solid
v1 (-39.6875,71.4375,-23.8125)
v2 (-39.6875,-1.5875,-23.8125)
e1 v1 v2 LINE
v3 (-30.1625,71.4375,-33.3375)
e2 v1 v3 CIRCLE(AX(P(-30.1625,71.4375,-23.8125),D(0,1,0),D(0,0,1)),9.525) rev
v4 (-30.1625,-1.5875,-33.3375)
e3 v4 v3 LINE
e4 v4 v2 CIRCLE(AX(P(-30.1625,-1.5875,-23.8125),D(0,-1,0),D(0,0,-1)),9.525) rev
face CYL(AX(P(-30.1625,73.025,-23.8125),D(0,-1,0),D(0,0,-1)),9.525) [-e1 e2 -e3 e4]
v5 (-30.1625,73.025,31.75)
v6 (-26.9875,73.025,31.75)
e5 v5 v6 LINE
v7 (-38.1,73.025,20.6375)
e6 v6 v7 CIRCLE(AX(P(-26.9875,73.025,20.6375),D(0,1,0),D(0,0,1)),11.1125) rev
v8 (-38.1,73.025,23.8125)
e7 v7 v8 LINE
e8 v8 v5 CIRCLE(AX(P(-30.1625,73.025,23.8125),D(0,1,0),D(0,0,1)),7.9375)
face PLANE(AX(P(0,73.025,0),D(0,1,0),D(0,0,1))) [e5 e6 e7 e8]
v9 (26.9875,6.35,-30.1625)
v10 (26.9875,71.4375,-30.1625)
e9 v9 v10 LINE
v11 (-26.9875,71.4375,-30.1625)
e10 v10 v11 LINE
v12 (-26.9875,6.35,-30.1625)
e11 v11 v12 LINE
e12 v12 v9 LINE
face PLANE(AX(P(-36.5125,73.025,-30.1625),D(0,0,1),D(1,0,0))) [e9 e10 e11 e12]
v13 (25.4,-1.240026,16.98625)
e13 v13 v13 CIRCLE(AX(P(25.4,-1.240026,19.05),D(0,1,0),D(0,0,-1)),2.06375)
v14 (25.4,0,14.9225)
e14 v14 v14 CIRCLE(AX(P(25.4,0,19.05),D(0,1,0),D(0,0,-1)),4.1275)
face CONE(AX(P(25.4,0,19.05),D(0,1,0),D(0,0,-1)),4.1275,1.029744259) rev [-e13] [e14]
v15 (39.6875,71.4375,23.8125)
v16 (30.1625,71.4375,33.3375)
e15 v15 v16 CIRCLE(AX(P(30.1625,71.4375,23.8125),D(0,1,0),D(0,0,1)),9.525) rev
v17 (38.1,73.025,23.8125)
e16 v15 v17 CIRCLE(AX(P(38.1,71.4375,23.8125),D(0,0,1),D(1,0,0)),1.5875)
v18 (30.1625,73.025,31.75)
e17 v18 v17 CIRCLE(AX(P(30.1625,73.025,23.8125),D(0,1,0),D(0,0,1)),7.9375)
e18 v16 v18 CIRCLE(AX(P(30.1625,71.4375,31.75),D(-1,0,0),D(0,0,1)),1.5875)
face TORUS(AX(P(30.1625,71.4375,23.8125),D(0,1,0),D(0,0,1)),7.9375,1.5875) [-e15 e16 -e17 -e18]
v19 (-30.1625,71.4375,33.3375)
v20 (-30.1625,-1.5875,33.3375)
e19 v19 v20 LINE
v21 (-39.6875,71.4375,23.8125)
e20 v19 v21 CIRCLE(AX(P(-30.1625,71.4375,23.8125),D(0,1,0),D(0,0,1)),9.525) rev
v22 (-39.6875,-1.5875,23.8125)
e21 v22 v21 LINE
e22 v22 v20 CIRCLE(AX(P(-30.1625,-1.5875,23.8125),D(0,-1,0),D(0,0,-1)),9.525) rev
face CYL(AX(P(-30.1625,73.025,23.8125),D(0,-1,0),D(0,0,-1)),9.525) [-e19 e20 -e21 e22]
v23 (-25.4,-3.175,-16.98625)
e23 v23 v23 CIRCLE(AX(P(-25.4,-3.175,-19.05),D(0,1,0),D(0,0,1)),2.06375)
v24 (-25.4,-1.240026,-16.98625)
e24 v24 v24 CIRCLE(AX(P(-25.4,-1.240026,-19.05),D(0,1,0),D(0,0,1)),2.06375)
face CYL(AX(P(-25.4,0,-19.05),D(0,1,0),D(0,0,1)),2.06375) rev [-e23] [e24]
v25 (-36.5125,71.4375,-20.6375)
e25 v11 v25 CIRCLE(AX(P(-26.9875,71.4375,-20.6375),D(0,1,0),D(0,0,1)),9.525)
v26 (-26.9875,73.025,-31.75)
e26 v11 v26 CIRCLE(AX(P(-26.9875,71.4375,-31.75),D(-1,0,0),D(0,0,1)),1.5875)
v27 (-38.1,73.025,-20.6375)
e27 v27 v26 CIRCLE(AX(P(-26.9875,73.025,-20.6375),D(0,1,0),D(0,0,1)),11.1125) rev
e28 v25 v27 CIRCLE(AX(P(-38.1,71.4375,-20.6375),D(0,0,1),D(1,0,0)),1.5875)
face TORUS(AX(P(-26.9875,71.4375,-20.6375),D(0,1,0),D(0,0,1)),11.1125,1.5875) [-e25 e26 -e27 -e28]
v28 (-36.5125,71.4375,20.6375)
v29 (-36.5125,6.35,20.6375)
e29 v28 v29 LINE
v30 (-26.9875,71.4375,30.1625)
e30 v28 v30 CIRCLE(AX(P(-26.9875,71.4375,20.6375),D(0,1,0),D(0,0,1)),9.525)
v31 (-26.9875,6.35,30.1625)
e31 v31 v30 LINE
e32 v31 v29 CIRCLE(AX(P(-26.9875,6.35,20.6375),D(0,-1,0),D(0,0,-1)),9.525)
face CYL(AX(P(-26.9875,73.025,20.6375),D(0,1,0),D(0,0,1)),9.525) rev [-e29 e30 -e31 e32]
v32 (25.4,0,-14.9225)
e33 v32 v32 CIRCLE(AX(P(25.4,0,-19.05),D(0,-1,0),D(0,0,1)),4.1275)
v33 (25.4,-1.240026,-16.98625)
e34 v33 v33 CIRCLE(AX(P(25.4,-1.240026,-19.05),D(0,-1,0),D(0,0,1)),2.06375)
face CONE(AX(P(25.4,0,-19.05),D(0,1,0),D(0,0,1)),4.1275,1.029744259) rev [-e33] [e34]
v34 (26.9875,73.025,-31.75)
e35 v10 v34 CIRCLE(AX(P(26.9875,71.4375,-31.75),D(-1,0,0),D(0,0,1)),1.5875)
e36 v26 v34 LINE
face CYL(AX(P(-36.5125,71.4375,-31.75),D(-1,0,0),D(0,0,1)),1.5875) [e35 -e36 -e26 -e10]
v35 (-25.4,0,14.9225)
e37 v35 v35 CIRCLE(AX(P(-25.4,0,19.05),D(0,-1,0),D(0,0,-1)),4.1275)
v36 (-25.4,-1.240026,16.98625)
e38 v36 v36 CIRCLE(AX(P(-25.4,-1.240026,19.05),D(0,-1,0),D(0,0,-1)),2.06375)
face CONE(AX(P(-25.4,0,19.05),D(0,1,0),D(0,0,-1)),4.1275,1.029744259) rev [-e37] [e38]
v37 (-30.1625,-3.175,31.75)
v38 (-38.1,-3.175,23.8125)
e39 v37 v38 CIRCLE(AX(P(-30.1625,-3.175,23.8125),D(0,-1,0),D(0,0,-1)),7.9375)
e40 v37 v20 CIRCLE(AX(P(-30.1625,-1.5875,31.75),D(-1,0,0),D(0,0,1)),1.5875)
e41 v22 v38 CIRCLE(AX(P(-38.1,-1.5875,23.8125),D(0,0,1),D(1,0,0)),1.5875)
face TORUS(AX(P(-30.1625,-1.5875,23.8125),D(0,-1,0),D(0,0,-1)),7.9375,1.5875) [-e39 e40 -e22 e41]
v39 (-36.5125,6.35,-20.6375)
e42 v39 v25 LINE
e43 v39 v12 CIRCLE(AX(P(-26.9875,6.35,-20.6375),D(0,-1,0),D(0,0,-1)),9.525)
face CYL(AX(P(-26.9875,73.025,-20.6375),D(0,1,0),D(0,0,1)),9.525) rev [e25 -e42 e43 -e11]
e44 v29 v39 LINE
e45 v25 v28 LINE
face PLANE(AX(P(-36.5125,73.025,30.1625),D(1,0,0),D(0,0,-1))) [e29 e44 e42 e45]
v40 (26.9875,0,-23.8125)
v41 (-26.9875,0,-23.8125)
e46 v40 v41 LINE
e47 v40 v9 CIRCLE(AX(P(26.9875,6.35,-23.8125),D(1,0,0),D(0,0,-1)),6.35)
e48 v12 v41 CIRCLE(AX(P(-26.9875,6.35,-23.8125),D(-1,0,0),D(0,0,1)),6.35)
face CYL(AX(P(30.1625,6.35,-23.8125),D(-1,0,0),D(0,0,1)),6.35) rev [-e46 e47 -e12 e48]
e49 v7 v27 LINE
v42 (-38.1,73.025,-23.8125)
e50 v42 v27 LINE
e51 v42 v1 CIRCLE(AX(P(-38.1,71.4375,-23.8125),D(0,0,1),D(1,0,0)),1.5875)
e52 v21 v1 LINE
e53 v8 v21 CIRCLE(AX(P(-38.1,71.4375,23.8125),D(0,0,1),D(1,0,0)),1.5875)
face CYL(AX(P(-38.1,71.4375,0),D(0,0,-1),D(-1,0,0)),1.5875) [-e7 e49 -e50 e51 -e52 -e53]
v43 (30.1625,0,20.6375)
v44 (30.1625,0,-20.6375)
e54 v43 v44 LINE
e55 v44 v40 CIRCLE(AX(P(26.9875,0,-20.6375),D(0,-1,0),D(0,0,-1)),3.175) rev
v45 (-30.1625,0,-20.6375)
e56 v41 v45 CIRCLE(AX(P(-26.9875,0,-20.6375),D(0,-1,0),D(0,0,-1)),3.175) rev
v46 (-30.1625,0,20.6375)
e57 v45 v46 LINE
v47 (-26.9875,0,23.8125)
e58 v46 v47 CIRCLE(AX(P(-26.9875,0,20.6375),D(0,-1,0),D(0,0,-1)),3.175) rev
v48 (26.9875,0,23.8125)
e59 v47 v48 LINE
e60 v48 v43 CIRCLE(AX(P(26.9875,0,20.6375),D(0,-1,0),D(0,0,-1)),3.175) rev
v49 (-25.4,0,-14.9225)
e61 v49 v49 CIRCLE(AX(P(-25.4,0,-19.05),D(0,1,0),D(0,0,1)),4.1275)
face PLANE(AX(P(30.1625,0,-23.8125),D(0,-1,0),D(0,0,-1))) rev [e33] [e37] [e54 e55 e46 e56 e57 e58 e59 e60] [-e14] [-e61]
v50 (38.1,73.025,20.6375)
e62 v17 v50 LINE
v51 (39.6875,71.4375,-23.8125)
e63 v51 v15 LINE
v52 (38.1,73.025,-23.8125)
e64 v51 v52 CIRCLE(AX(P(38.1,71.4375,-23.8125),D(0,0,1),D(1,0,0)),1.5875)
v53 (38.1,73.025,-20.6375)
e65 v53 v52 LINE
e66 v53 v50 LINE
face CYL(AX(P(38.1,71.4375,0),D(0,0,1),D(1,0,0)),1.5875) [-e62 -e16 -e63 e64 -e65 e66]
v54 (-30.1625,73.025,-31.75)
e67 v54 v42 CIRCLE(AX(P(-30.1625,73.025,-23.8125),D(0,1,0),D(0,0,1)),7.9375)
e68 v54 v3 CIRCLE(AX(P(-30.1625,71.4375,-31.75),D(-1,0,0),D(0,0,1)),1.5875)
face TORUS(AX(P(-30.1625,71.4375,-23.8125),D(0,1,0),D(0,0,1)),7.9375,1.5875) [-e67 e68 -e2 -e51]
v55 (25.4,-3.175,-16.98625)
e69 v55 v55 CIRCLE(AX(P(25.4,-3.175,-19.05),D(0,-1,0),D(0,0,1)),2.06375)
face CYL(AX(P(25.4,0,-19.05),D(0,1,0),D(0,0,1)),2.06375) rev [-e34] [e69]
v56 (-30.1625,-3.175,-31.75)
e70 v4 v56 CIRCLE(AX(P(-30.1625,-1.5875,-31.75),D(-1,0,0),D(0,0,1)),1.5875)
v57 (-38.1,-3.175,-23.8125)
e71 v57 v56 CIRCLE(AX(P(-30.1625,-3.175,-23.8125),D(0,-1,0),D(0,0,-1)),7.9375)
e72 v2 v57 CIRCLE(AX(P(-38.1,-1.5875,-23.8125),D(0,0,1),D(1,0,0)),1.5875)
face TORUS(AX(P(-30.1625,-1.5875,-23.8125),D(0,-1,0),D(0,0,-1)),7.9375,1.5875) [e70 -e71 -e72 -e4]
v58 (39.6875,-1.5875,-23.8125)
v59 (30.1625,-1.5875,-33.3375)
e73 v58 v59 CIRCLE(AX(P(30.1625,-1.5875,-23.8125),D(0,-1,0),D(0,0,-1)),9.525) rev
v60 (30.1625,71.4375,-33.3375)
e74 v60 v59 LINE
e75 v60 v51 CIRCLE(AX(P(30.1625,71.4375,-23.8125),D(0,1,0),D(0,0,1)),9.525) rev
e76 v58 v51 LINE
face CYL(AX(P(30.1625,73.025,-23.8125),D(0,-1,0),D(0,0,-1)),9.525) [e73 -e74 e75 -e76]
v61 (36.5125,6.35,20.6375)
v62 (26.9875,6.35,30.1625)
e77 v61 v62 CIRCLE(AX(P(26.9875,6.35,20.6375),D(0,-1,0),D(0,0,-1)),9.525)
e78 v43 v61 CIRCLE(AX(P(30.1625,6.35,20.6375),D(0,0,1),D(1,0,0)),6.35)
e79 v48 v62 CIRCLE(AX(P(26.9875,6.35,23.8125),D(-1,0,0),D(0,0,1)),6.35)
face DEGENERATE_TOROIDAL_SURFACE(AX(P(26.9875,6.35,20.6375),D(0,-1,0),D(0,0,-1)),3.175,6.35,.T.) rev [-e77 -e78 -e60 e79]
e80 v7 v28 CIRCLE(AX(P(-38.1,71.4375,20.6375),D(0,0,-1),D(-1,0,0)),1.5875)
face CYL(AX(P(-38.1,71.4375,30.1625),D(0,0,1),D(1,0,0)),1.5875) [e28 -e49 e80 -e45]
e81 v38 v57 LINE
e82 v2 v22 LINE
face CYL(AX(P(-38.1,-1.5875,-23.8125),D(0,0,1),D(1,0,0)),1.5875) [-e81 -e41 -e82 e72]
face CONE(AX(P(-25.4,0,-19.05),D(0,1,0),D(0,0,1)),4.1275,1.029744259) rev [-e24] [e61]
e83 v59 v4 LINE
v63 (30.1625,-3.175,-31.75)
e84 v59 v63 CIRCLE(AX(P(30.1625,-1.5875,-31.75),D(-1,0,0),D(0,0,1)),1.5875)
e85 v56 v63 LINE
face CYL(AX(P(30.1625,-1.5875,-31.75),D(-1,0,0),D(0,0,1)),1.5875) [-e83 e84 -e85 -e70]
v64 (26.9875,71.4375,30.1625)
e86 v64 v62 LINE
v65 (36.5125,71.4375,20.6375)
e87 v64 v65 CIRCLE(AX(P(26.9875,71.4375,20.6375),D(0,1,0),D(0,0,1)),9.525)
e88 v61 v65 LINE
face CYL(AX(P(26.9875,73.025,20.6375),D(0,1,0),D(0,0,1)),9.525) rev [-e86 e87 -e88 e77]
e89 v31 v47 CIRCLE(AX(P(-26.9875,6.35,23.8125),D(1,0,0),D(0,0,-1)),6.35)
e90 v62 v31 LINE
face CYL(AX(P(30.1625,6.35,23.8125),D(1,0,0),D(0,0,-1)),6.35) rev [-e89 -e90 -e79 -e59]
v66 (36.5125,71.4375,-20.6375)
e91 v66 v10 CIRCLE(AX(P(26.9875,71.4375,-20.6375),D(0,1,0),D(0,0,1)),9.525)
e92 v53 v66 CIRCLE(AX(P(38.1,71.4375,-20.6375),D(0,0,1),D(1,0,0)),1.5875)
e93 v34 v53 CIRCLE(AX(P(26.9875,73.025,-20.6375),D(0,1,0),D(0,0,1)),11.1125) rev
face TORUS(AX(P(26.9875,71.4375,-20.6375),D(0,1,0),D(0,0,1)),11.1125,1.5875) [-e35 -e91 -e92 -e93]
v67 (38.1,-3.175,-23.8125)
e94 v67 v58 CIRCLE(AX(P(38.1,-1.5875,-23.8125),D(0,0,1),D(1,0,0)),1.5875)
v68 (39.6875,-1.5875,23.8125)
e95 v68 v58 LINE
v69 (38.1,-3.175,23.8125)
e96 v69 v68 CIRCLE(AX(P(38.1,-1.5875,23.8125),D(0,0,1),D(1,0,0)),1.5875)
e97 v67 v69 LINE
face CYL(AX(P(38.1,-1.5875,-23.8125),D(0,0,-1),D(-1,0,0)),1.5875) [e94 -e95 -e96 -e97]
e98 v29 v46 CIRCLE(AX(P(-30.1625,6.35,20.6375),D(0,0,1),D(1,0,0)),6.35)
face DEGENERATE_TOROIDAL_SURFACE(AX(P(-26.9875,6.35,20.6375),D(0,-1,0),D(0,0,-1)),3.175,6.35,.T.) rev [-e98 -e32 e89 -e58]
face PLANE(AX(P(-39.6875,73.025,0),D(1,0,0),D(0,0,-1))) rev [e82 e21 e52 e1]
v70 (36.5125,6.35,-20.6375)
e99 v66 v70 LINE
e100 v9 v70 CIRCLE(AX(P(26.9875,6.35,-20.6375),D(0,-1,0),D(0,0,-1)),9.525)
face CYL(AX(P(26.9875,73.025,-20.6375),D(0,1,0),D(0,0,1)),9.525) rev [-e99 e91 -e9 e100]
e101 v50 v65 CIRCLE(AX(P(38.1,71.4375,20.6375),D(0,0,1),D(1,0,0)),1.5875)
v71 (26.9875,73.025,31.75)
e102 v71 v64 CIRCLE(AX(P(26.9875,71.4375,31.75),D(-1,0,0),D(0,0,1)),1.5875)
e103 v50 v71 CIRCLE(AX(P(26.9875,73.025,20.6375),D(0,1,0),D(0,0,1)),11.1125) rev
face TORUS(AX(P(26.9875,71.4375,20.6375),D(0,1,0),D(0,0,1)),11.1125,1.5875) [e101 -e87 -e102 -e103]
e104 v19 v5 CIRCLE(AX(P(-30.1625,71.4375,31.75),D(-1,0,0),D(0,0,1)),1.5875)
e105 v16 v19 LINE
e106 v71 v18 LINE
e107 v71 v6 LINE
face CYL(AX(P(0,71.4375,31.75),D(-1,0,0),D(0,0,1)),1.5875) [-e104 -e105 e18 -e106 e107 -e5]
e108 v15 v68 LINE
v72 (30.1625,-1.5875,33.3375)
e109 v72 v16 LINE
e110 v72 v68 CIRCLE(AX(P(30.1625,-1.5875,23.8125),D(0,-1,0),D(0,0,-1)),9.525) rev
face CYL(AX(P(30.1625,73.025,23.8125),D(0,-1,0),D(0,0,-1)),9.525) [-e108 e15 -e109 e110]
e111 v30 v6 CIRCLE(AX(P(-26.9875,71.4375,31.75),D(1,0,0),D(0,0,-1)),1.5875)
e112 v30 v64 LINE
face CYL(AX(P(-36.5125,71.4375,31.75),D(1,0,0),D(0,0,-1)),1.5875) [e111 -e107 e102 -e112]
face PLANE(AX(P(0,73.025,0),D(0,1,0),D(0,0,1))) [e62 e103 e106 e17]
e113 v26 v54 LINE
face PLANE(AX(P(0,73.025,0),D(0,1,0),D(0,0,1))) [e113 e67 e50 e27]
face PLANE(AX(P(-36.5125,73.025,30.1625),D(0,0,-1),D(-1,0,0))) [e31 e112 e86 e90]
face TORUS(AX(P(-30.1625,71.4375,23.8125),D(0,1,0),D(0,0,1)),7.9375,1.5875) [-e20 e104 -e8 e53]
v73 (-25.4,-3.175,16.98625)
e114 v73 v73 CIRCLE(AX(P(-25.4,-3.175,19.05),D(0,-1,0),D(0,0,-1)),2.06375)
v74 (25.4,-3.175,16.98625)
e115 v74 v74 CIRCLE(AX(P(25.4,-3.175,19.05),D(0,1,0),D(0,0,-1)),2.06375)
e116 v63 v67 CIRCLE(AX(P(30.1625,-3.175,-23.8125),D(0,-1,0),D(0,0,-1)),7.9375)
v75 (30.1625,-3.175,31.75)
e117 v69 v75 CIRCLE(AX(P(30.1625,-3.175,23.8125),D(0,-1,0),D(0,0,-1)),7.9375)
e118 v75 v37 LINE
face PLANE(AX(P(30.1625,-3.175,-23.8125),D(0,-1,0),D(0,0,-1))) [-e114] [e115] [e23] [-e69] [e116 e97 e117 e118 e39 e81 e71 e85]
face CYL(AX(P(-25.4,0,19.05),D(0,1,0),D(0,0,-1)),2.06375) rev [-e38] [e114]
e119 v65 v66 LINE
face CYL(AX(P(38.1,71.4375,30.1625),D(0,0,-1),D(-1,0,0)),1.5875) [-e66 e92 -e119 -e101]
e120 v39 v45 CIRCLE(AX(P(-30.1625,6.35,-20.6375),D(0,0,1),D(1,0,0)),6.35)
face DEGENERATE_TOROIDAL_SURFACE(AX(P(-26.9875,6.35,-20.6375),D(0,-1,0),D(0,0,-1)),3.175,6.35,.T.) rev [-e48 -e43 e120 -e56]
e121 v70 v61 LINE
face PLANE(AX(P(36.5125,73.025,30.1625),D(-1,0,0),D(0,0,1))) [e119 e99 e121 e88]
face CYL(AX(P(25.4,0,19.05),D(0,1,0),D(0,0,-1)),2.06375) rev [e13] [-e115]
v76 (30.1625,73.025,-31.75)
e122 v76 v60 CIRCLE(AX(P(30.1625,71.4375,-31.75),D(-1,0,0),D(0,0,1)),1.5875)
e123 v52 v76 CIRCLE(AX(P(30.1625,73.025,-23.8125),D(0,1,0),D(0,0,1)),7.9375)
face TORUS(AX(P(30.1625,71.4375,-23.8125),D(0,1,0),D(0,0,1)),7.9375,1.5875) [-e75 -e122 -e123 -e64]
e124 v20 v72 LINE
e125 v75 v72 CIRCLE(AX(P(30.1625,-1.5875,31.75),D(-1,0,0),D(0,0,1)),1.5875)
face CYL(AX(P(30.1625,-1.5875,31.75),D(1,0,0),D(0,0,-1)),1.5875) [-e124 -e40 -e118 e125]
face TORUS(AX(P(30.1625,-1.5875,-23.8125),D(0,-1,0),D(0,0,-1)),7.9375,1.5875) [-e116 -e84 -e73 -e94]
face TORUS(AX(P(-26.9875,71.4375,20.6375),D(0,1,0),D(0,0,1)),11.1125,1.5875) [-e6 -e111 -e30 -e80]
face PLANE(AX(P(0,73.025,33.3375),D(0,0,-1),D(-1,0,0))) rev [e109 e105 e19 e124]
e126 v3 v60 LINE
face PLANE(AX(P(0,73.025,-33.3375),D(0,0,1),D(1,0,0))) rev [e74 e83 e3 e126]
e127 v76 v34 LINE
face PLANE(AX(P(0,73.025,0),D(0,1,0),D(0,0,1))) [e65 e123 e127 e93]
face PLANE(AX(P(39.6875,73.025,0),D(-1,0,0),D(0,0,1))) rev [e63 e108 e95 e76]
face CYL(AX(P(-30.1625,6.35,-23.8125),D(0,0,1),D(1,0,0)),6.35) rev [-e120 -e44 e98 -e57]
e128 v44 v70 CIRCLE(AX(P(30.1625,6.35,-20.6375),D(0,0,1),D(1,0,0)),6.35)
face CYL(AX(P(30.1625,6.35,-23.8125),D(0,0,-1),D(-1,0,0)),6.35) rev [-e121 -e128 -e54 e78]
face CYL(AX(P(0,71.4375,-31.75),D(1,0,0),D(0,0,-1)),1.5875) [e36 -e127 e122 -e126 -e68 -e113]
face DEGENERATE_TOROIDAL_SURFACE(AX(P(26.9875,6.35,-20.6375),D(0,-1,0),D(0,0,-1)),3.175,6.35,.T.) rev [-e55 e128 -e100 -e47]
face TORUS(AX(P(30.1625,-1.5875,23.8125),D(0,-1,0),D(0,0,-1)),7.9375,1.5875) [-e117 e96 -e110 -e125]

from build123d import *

# Parameters (mm, degrees)
SKETCH1_W           = 79.375
SKETCH1_H           = 66.675
SKETCH1_W_2         = 73.025
SKETCH1_H_2         = 60.325
EXTRUDE_THIN1_DEPTH = 73.025
FILLET1_R           = 9.525
BOSS_EXTRUDE1_DEPTH = 3.175
FILLET2_R           = 6.35
FILLET3_R           = 1.5875


with BuildPart() as part:
    # Sketch1 → Extrude-Thin1 (new body)
    with BuildSketch(Plane(origin=(0, 0, 0), x_dir=(1, 0, 0), z_dir=(0, 1, 0))):
        Rectangle(SKETCH1_W, SKETCH1_H)
        Rectangle(SKETCH1_W_2, SKETCH1_H_2, mode=Mode.SUBTRACT)
    extrude(amount=EXTRUDE_THIN1_DEPTH)

    # Fillet1
    fillet1_edges = [part.edges().sort_by_distance(p)[0] for p in [
        (36.5125, 36.5125, 30.1625),
        (36.5125, 36.5125, -30.1625),
        (-36.5125, 36.5125, -30.1625),
        (-36.5125, 36.5125, 30.1625),
        (39.6875, 36.5125, 33.3375),
        (-39.6875, 36.5125, 33.3375),
        (-39.6875, 36.5125, -33.3375),
        (39.6875, 36.5125, -33.3375),
    ]]
    fillet(fillet1_edges, radius=FILLET1_R)

    # Sketch2 → Boss-Extrude1 (add)
    with BuildSketch(Plane.XZ):
        with BuildLine():
            Line((39.6875, -23.8125), (39.6875, 23.8125))
            ThreePointArc((39.6875, 23.8125), (36.897692091, 30.547692091), (30.1625, 33.3375))
            Line((30.1625, 33.3375), (-30.1625, 33.3375))
            ThreePointArc((-30.1625, 33.3375), (-36.897692091, 30.547692091), (-39.6875, 23.8125))
            Line((-39.6875, 23.8125), (-39.6875, -23.8125))
            ThreePointArc((-39.6875, -23.8125), (-36.897692091, -30.547692091), (-30.1625, -33.3375))
            Line((-30.1625, -33.3375), (30.1625, -33.3375))
            ThreePointArc((30.1625, -33.3375), (36.897692091, -30.547692091), (39.6875, -23.8125))
        make_face()
    extrude(amount=BOSS_EXTRUDE1_DEPTH)

    # Fillet2
    fillet2_edges = [part.edges().sort_by_distance(p)[0] for p in [
        (-36.5125, 0, 0),
        (0, 0, 30.1625),
        (36.5125, 0, 0),
        (0, 0, -30.1625),
        (-33.722692091, 0, 27.372692091),
        (33.722692091, 0, 27.372692091),
        (33.722692091, 0, -27.372692091),
        (-33.722692091, 0, -27.372692091),
    ]]
    fillet(fillet2_edges, radius=FILLET2_R)

    # Fillet3
    fillet3_edges = [part.edges().sort_by_distance(p)[0] for p in [
        (-36.5125, 73.025, 0),
        (0, 73.025, 30.1625),
        (36.5125, 73.025, 0),
        (0, 73.025, -30.1625),
        (39.6875, 73.025, 0),
        (0, 73.025, 33.3375),
        (0, 73.025, -33.3375),
        (-39.6875, 73.025, 0),
        (36.897692091, 73.025, -30.547692091),
        (-36.897692091, 73.025, -30.547692091),
        (-36.897692091, 73.025, 30.547692091),
        (36.897692091, 73.025, 30.547692091),
        (-33.722692091, 73.025, 27.372692091),
        (33.722692091, 73.025, 27.372692091),
        (33.722692091, 73.025, -27.372692091),
        (-33.722692091, 73.025, -27.372692091),
        (36.897692091, -3.175, -30.547692091),
        (39.6875, -3.175, 0),
        (36.897692091, -3.175, 30.547692091),
        (0, -3.175, 33.3375),
        (-36.897692091, -3.175, 30.547692091),
        (-39.6875, -3.175, 0),
        (-36.897692091, -3.175, -30.547692091),
        (0, -3.175, -33.3375),
    ]]
    fillet(fillet3_edges, radius=FILLET3_R - 0.0001)  # a hair under: the kernel refuses the full size

    # Sketch4 → Cut-Revolve1 (revolve, cut)
    with BuildSketch(Plane.YX.offset(19.05), mode=Mode.PRIVATE) as cut_revolve1_sk:
        Polygon((-3.175, -23.33625), (-1.240026103, -23.33625), (0, -21.2725), (0, -25.4), (-3.175, -25.4), align=None)
    cut_revolve1 = revolve(cut_revolve1_sk.sketch.rotate(Axis((-25.4, 0, -19.05), (0, -1, 0)), 90), axis=Axis((-25.4, 0, -19.05), (0, -1, 0)), mode=Mode.SUBTRACT)

    # Mirror1: Cut-Revolve1 across plane
    add(cut_revolve1.mirror(Plane(origin=(0, 0, 0), x_dir=(0, 0, 1), z_dir=(1, 0, 0))), mode=Mode.SUBTRACT)

    # Mirror2: Cut-Revolve1 across plane
    add(cut_revolve1.mirror(Plane.XY), mode=Mode.SUBTRACT)

    # Mirror2 copy 1 sketch → Mirror2 copy 1 (revolve, cut)
    with BuildSketch(Plane(origin=(0, 0, 19.05), x_dir=(0, 1, 0), z_dir=(0, 0, 1))):
        Polygon((-3.175, -23.33625), (-1.240026103, -23.33625), (0, -21.2725), (0, -25.4), (-3.175, -25.4), align=None)
    revolve(axis=Axis((25.4, 0, 19.05), (0, -1, 0)), mode=Mode.SUBTRACT)


solid = part.part
